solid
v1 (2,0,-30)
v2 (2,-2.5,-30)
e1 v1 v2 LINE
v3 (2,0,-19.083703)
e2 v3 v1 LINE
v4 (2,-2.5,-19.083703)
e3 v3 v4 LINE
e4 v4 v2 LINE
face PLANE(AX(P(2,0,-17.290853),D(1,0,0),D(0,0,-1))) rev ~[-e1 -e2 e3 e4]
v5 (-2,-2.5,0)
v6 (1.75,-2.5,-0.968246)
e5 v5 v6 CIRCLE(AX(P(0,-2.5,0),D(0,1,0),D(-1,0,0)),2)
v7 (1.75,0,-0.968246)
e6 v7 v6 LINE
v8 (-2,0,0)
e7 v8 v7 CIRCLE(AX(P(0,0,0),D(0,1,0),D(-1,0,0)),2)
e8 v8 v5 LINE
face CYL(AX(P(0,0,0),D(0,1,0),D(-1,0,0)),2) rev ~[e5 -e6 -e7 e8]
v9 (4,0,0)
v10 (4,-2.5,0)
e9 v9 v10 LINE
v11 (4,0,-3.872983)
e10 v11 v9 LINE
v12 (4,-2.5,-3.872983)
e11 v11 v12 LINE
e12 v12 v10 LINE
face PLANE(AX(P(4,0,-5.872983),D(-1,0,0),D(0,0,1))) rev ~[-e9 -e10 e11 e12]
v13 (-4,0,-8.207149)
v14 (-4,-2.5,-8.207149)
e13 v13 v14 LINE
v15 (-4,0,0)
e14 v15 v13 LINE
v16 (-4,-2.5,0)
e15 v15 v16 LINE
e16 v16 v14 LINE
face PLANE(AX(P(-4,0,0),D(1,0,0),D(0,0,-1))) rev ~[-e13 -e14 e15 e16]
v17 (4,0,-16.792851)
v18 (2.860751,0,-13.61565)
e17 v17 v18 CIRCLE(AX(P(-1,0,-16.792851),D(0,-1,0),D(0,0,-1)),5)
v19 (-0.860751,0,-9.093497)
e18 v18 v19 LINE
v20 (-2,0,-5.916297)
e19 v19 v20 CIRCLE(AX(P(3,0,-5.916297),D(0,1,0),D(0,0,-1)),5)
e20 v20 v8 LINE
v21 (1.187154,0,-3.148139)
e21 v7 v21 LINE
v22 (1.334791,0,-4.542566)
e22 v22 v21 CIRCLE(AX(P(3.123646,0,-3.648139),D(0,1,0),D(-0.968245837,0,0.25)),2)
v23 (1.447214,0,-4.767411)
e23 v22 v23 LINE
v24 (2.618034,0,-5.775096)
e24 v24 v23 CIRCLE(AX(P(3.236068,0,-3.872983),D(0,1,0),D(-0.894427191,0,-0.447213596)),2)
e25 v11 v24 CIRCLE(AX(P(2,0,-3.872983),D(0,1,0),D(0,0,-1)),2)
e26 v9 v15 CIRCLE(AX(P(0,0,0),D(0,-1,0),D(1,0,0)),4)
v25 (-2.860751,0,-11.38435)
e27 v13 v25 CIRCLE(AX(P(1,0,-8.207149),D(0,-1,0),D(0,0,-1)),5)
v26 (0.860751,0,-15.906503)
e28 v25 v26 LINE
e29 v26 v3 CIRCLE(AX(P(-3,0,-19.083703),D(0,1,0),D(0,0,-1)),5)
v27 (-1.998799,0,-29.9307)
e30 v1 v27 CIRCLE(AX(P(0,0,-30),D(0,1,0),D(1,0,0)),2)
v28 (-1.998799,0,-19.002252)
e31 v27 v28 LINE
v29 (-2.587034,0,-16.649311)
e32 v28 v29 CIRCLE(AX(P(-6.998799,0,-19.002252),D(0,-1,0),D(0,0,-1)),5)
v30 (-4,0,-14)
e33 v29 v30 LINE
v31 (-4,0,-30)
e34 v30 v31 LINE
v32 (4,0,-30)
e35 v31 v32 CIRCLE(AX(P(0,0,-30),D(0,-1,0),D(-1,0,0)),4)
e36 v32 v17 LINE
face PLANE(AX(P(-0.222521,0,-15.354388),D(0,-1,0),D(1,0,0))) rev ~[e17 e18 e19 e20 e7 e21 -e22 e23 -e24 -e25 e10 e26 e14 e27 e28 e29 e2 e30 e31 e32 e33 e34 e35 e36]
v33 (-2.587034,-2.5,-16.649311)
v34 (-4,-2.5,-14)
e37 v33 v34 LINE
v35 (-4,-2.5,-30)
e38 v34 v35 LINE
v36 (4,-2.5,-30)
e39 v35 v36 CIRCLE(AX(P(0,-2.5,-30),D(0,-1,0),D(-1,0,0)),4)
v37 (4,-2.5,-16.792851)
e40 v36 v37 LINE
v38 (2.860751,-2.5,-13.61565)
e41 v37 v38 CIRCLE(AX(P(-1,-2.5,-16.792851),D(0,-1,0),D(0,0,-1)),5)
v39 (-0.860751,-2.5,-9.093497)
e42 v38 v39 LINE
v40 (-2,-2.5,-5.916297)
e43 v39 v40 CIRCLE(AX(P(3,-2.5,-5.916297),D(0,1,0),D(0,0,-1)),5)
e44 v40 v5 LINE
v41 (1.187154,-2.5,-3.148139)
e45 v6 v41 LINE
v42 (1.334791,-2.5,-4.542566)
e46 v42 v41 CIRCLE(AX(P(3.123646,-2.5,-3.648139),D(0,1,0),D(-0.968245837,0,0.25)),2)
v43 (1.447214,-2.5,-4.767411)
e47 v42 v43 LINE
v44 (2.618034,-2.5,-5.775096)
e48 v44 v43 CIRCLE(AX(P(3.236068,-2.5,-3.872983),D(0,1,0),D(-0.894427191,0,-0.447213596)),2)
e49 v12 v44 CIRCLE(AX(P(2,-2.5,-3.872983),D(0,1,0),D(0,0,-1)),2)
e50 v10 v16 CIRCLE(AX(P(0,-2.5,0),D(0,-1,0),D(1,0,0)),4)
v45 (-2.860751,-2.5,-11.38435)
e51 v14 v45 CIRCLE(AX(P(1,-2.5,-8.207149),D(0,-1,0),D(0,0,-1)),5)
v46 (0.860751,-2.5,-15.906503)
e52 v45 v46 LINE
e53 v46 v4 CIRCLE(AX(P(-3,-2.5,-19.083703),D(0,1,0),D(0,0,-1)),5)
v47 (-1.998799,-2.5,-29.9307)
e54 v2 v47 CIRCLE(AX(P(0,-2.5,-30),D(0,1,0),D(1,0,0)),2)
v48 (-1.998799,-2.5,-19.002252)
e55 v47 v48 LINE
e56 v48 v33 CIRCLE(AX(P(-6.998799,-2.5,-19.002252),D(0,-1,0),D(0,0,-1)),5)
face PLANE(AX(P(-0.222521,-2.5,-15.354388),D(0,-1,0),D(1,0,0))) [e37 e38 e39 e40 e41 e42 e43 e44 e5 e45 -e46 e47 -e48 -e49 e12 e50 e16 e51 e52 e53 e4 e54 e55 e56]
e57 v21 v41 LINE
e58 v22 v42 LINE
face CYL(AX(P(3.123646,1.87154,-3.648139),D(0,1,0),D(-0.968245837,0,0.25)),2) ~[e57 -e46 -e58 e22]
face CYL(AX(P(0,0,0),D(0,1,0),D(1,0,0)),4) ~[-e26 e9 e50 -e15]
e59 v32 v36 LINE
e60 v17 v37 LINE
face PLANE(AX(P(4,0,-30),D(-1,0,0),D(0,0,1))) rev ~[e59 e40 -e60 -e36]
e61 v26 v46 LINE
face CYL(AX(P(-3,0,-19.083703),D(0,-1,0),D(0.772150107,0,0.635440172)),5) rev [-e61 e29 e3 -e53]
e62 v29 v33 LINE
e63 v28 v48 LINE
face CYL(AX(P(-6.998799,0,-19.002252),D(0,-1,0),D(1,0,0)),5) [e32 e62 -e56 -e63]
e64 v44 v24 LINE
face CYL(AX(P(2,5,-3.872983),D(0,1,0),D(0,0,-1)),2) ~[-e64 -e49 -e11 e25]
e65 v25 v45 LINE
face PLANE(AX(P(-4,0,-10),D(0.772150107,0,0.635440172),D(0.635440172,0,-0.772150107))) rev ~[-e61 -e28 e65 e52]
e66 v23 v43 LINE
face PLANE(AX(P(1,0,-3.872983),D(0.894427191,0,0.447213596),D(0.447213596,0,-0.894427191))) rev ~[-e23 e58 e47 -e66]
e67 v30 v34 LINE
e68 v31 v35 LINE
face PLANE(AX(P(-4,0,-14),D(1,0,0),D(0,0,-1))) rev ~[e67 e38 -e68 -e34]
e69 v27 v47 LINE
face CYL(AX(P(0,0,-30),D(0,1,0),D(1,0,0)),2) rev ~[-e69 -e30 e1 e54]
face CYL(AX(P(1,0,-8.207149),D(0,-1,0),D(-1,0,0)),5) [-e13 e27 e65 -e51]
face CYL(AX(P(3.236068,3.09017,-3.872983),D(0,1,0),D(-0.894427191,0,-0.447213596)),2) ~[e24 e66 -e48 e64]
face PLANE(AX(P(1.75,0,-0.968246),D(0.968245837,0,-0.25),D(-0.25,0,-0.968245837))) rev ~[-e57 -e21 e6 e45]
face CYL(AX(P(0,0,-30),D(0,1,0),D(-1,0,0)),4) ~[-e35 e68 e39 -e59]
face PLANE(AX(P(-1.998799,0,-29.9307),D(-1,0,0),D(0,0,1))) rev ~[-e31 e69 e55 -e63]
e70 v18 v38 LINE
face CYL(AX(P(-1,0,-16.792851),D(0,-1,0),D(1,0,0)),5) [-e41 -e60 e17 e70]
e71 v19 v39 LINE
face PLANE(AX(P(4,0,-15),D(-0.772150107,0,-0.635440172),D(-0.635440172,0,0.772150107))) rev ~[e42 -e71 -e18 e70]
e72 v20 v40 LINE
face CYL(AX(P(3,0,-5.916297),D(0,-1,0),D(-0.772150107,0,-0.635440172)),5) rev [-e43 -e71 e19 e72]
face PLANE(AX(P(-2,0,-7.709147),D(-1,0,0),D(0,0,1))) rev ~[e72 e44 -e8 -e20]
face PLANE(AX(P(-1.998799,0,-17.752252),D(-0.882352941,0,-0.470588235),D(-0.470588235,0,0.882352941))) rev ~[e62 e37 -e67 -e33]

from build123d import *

# Parameters (mm, degrees)
F1_DEPTH    = 2.5
F2_R        = 5
F3_T1_DEPTH = 6.2430809658
F3_T3_DEPTH = 8.6803398875
F3_T5_DEPTH = 12.5


# Not quite as in the source:
# - a fillet or chamfer that OpenCascade refuses, or shapes differently, is made with other operations: its cross-section is extruded or revolved along the edge and cut away or added


with BuildPart() as f1:
    # F0 (on Front) → F1 (new body)
    with BuildSketch(Plane.XZ):
        with BuildLine():
            ThreePointArc((-2, 0), (0.5, 1.9364916731), (1.75, -0.9682458366))
            Line((1.75, -0.9682458366), (1, -3.8729833462))
            Line((1, -3.8729833462), (2, -5.8729833462))
            Line((2, -5.8729833462), (4, -5.8729833462))
            Line((4, -5.8729833462), (4, 0))
            ThreePointArc((4, 0), (0, 4), (-4, 0))
            Line((-4, 0), (-4, -10))
            Line((-4, -10), (2, -17.2908526251))
            Line((2, -17.2908526251), (2, -30))
            ThreePointArc((2, -30), (-0.0346553957, -31.9996997283), (-1.9987990036, -29.9306996147))
            Line((-1.9987990036, -29.9306996147), (-1.9987990036, -17.7522518683))
            Line((-1.9987990036, -17.7522518683), (-4, -14))
            Line((-4, -14), (-4, -30))
            ThreePointArc((-4, -30), (0, -34), (4, -30))
            Line((4, -30), (4, -15))
            Line((4, -15), (-2, -7.7091473749))
            Line((-2, -7.7091473749), (-2, 0))
        make_face()
    extrude(amount=F1_DEPTH)

    # F2
    f2_edges = [f1.edges().sort_by_distance(p)[0] for p in [
        (-4, -1.25, -10),
        (2, -1.25, -17.290853),
        (4, -1.25, -15),
        (-2, -1.25, -7.709147),
        (-1.998799, -1.25, -17.752252),
    ]]
    fillet(f2_edges, radius=F2_R)

    # F3: fillet of radius 2 on 3 edges, made by hand

    # F3_s2 → F3_t1 (cut)
    with BuildSketch(Plane.XZ.offset(-1.8715404829)):
        with BuildLine():
            ThreePointArc((1.1871540483, -3.148138834), (1.1347622142, -3.8587151733), (1.3347913394, -4.542566025))
            Line((1.3347913394, -4.542566025), (1, -3.8729833462))
            Line((1, -3.8729833462), (1.1871540483, -3.148138834))
        make_face()
    extrude(amount=F3_T1_DEPTH, mode=Mode.SUBTRACT)

    # F3_s4 → F3_t3 (cut)
    with BuildSketch(Plane.XZ.offset(-3.0901699437)):
        with BuildLine():
            ThreePointArc((1.4472135955, -4.7674105372), (2.1846057533, -5.5742849629), (3.2360679775, -5.8729833462))
            Line((3.2360679775, -5.8729833462), (2, -5.8729833462))
            Line((2, -5.8729833462), (1.4472135955, -4.7674105372))
        make_face()
    extrude(amount=F3_T3_DEPTH, mode=Mode.SUBTRACT)

    # F3_s6 → F3_t5 (cut)
    with BuildSketch(Plane.XZ.offset(-5)):
        with BuildLine():
            ThreePointArc((2, -5.8729833462), (3.4142135624, -5.2871969086), (4, -3.8729833462))
            Line((4, -3.8729833462), (4, -5.8729833462))
            Line((4, -5.8729833462), (2, -5.8729833462))
        make_face()
    extrude(amount=F3_T5_DEPTH, mode=Mode.SUBTRACT)


solid = f1.part
